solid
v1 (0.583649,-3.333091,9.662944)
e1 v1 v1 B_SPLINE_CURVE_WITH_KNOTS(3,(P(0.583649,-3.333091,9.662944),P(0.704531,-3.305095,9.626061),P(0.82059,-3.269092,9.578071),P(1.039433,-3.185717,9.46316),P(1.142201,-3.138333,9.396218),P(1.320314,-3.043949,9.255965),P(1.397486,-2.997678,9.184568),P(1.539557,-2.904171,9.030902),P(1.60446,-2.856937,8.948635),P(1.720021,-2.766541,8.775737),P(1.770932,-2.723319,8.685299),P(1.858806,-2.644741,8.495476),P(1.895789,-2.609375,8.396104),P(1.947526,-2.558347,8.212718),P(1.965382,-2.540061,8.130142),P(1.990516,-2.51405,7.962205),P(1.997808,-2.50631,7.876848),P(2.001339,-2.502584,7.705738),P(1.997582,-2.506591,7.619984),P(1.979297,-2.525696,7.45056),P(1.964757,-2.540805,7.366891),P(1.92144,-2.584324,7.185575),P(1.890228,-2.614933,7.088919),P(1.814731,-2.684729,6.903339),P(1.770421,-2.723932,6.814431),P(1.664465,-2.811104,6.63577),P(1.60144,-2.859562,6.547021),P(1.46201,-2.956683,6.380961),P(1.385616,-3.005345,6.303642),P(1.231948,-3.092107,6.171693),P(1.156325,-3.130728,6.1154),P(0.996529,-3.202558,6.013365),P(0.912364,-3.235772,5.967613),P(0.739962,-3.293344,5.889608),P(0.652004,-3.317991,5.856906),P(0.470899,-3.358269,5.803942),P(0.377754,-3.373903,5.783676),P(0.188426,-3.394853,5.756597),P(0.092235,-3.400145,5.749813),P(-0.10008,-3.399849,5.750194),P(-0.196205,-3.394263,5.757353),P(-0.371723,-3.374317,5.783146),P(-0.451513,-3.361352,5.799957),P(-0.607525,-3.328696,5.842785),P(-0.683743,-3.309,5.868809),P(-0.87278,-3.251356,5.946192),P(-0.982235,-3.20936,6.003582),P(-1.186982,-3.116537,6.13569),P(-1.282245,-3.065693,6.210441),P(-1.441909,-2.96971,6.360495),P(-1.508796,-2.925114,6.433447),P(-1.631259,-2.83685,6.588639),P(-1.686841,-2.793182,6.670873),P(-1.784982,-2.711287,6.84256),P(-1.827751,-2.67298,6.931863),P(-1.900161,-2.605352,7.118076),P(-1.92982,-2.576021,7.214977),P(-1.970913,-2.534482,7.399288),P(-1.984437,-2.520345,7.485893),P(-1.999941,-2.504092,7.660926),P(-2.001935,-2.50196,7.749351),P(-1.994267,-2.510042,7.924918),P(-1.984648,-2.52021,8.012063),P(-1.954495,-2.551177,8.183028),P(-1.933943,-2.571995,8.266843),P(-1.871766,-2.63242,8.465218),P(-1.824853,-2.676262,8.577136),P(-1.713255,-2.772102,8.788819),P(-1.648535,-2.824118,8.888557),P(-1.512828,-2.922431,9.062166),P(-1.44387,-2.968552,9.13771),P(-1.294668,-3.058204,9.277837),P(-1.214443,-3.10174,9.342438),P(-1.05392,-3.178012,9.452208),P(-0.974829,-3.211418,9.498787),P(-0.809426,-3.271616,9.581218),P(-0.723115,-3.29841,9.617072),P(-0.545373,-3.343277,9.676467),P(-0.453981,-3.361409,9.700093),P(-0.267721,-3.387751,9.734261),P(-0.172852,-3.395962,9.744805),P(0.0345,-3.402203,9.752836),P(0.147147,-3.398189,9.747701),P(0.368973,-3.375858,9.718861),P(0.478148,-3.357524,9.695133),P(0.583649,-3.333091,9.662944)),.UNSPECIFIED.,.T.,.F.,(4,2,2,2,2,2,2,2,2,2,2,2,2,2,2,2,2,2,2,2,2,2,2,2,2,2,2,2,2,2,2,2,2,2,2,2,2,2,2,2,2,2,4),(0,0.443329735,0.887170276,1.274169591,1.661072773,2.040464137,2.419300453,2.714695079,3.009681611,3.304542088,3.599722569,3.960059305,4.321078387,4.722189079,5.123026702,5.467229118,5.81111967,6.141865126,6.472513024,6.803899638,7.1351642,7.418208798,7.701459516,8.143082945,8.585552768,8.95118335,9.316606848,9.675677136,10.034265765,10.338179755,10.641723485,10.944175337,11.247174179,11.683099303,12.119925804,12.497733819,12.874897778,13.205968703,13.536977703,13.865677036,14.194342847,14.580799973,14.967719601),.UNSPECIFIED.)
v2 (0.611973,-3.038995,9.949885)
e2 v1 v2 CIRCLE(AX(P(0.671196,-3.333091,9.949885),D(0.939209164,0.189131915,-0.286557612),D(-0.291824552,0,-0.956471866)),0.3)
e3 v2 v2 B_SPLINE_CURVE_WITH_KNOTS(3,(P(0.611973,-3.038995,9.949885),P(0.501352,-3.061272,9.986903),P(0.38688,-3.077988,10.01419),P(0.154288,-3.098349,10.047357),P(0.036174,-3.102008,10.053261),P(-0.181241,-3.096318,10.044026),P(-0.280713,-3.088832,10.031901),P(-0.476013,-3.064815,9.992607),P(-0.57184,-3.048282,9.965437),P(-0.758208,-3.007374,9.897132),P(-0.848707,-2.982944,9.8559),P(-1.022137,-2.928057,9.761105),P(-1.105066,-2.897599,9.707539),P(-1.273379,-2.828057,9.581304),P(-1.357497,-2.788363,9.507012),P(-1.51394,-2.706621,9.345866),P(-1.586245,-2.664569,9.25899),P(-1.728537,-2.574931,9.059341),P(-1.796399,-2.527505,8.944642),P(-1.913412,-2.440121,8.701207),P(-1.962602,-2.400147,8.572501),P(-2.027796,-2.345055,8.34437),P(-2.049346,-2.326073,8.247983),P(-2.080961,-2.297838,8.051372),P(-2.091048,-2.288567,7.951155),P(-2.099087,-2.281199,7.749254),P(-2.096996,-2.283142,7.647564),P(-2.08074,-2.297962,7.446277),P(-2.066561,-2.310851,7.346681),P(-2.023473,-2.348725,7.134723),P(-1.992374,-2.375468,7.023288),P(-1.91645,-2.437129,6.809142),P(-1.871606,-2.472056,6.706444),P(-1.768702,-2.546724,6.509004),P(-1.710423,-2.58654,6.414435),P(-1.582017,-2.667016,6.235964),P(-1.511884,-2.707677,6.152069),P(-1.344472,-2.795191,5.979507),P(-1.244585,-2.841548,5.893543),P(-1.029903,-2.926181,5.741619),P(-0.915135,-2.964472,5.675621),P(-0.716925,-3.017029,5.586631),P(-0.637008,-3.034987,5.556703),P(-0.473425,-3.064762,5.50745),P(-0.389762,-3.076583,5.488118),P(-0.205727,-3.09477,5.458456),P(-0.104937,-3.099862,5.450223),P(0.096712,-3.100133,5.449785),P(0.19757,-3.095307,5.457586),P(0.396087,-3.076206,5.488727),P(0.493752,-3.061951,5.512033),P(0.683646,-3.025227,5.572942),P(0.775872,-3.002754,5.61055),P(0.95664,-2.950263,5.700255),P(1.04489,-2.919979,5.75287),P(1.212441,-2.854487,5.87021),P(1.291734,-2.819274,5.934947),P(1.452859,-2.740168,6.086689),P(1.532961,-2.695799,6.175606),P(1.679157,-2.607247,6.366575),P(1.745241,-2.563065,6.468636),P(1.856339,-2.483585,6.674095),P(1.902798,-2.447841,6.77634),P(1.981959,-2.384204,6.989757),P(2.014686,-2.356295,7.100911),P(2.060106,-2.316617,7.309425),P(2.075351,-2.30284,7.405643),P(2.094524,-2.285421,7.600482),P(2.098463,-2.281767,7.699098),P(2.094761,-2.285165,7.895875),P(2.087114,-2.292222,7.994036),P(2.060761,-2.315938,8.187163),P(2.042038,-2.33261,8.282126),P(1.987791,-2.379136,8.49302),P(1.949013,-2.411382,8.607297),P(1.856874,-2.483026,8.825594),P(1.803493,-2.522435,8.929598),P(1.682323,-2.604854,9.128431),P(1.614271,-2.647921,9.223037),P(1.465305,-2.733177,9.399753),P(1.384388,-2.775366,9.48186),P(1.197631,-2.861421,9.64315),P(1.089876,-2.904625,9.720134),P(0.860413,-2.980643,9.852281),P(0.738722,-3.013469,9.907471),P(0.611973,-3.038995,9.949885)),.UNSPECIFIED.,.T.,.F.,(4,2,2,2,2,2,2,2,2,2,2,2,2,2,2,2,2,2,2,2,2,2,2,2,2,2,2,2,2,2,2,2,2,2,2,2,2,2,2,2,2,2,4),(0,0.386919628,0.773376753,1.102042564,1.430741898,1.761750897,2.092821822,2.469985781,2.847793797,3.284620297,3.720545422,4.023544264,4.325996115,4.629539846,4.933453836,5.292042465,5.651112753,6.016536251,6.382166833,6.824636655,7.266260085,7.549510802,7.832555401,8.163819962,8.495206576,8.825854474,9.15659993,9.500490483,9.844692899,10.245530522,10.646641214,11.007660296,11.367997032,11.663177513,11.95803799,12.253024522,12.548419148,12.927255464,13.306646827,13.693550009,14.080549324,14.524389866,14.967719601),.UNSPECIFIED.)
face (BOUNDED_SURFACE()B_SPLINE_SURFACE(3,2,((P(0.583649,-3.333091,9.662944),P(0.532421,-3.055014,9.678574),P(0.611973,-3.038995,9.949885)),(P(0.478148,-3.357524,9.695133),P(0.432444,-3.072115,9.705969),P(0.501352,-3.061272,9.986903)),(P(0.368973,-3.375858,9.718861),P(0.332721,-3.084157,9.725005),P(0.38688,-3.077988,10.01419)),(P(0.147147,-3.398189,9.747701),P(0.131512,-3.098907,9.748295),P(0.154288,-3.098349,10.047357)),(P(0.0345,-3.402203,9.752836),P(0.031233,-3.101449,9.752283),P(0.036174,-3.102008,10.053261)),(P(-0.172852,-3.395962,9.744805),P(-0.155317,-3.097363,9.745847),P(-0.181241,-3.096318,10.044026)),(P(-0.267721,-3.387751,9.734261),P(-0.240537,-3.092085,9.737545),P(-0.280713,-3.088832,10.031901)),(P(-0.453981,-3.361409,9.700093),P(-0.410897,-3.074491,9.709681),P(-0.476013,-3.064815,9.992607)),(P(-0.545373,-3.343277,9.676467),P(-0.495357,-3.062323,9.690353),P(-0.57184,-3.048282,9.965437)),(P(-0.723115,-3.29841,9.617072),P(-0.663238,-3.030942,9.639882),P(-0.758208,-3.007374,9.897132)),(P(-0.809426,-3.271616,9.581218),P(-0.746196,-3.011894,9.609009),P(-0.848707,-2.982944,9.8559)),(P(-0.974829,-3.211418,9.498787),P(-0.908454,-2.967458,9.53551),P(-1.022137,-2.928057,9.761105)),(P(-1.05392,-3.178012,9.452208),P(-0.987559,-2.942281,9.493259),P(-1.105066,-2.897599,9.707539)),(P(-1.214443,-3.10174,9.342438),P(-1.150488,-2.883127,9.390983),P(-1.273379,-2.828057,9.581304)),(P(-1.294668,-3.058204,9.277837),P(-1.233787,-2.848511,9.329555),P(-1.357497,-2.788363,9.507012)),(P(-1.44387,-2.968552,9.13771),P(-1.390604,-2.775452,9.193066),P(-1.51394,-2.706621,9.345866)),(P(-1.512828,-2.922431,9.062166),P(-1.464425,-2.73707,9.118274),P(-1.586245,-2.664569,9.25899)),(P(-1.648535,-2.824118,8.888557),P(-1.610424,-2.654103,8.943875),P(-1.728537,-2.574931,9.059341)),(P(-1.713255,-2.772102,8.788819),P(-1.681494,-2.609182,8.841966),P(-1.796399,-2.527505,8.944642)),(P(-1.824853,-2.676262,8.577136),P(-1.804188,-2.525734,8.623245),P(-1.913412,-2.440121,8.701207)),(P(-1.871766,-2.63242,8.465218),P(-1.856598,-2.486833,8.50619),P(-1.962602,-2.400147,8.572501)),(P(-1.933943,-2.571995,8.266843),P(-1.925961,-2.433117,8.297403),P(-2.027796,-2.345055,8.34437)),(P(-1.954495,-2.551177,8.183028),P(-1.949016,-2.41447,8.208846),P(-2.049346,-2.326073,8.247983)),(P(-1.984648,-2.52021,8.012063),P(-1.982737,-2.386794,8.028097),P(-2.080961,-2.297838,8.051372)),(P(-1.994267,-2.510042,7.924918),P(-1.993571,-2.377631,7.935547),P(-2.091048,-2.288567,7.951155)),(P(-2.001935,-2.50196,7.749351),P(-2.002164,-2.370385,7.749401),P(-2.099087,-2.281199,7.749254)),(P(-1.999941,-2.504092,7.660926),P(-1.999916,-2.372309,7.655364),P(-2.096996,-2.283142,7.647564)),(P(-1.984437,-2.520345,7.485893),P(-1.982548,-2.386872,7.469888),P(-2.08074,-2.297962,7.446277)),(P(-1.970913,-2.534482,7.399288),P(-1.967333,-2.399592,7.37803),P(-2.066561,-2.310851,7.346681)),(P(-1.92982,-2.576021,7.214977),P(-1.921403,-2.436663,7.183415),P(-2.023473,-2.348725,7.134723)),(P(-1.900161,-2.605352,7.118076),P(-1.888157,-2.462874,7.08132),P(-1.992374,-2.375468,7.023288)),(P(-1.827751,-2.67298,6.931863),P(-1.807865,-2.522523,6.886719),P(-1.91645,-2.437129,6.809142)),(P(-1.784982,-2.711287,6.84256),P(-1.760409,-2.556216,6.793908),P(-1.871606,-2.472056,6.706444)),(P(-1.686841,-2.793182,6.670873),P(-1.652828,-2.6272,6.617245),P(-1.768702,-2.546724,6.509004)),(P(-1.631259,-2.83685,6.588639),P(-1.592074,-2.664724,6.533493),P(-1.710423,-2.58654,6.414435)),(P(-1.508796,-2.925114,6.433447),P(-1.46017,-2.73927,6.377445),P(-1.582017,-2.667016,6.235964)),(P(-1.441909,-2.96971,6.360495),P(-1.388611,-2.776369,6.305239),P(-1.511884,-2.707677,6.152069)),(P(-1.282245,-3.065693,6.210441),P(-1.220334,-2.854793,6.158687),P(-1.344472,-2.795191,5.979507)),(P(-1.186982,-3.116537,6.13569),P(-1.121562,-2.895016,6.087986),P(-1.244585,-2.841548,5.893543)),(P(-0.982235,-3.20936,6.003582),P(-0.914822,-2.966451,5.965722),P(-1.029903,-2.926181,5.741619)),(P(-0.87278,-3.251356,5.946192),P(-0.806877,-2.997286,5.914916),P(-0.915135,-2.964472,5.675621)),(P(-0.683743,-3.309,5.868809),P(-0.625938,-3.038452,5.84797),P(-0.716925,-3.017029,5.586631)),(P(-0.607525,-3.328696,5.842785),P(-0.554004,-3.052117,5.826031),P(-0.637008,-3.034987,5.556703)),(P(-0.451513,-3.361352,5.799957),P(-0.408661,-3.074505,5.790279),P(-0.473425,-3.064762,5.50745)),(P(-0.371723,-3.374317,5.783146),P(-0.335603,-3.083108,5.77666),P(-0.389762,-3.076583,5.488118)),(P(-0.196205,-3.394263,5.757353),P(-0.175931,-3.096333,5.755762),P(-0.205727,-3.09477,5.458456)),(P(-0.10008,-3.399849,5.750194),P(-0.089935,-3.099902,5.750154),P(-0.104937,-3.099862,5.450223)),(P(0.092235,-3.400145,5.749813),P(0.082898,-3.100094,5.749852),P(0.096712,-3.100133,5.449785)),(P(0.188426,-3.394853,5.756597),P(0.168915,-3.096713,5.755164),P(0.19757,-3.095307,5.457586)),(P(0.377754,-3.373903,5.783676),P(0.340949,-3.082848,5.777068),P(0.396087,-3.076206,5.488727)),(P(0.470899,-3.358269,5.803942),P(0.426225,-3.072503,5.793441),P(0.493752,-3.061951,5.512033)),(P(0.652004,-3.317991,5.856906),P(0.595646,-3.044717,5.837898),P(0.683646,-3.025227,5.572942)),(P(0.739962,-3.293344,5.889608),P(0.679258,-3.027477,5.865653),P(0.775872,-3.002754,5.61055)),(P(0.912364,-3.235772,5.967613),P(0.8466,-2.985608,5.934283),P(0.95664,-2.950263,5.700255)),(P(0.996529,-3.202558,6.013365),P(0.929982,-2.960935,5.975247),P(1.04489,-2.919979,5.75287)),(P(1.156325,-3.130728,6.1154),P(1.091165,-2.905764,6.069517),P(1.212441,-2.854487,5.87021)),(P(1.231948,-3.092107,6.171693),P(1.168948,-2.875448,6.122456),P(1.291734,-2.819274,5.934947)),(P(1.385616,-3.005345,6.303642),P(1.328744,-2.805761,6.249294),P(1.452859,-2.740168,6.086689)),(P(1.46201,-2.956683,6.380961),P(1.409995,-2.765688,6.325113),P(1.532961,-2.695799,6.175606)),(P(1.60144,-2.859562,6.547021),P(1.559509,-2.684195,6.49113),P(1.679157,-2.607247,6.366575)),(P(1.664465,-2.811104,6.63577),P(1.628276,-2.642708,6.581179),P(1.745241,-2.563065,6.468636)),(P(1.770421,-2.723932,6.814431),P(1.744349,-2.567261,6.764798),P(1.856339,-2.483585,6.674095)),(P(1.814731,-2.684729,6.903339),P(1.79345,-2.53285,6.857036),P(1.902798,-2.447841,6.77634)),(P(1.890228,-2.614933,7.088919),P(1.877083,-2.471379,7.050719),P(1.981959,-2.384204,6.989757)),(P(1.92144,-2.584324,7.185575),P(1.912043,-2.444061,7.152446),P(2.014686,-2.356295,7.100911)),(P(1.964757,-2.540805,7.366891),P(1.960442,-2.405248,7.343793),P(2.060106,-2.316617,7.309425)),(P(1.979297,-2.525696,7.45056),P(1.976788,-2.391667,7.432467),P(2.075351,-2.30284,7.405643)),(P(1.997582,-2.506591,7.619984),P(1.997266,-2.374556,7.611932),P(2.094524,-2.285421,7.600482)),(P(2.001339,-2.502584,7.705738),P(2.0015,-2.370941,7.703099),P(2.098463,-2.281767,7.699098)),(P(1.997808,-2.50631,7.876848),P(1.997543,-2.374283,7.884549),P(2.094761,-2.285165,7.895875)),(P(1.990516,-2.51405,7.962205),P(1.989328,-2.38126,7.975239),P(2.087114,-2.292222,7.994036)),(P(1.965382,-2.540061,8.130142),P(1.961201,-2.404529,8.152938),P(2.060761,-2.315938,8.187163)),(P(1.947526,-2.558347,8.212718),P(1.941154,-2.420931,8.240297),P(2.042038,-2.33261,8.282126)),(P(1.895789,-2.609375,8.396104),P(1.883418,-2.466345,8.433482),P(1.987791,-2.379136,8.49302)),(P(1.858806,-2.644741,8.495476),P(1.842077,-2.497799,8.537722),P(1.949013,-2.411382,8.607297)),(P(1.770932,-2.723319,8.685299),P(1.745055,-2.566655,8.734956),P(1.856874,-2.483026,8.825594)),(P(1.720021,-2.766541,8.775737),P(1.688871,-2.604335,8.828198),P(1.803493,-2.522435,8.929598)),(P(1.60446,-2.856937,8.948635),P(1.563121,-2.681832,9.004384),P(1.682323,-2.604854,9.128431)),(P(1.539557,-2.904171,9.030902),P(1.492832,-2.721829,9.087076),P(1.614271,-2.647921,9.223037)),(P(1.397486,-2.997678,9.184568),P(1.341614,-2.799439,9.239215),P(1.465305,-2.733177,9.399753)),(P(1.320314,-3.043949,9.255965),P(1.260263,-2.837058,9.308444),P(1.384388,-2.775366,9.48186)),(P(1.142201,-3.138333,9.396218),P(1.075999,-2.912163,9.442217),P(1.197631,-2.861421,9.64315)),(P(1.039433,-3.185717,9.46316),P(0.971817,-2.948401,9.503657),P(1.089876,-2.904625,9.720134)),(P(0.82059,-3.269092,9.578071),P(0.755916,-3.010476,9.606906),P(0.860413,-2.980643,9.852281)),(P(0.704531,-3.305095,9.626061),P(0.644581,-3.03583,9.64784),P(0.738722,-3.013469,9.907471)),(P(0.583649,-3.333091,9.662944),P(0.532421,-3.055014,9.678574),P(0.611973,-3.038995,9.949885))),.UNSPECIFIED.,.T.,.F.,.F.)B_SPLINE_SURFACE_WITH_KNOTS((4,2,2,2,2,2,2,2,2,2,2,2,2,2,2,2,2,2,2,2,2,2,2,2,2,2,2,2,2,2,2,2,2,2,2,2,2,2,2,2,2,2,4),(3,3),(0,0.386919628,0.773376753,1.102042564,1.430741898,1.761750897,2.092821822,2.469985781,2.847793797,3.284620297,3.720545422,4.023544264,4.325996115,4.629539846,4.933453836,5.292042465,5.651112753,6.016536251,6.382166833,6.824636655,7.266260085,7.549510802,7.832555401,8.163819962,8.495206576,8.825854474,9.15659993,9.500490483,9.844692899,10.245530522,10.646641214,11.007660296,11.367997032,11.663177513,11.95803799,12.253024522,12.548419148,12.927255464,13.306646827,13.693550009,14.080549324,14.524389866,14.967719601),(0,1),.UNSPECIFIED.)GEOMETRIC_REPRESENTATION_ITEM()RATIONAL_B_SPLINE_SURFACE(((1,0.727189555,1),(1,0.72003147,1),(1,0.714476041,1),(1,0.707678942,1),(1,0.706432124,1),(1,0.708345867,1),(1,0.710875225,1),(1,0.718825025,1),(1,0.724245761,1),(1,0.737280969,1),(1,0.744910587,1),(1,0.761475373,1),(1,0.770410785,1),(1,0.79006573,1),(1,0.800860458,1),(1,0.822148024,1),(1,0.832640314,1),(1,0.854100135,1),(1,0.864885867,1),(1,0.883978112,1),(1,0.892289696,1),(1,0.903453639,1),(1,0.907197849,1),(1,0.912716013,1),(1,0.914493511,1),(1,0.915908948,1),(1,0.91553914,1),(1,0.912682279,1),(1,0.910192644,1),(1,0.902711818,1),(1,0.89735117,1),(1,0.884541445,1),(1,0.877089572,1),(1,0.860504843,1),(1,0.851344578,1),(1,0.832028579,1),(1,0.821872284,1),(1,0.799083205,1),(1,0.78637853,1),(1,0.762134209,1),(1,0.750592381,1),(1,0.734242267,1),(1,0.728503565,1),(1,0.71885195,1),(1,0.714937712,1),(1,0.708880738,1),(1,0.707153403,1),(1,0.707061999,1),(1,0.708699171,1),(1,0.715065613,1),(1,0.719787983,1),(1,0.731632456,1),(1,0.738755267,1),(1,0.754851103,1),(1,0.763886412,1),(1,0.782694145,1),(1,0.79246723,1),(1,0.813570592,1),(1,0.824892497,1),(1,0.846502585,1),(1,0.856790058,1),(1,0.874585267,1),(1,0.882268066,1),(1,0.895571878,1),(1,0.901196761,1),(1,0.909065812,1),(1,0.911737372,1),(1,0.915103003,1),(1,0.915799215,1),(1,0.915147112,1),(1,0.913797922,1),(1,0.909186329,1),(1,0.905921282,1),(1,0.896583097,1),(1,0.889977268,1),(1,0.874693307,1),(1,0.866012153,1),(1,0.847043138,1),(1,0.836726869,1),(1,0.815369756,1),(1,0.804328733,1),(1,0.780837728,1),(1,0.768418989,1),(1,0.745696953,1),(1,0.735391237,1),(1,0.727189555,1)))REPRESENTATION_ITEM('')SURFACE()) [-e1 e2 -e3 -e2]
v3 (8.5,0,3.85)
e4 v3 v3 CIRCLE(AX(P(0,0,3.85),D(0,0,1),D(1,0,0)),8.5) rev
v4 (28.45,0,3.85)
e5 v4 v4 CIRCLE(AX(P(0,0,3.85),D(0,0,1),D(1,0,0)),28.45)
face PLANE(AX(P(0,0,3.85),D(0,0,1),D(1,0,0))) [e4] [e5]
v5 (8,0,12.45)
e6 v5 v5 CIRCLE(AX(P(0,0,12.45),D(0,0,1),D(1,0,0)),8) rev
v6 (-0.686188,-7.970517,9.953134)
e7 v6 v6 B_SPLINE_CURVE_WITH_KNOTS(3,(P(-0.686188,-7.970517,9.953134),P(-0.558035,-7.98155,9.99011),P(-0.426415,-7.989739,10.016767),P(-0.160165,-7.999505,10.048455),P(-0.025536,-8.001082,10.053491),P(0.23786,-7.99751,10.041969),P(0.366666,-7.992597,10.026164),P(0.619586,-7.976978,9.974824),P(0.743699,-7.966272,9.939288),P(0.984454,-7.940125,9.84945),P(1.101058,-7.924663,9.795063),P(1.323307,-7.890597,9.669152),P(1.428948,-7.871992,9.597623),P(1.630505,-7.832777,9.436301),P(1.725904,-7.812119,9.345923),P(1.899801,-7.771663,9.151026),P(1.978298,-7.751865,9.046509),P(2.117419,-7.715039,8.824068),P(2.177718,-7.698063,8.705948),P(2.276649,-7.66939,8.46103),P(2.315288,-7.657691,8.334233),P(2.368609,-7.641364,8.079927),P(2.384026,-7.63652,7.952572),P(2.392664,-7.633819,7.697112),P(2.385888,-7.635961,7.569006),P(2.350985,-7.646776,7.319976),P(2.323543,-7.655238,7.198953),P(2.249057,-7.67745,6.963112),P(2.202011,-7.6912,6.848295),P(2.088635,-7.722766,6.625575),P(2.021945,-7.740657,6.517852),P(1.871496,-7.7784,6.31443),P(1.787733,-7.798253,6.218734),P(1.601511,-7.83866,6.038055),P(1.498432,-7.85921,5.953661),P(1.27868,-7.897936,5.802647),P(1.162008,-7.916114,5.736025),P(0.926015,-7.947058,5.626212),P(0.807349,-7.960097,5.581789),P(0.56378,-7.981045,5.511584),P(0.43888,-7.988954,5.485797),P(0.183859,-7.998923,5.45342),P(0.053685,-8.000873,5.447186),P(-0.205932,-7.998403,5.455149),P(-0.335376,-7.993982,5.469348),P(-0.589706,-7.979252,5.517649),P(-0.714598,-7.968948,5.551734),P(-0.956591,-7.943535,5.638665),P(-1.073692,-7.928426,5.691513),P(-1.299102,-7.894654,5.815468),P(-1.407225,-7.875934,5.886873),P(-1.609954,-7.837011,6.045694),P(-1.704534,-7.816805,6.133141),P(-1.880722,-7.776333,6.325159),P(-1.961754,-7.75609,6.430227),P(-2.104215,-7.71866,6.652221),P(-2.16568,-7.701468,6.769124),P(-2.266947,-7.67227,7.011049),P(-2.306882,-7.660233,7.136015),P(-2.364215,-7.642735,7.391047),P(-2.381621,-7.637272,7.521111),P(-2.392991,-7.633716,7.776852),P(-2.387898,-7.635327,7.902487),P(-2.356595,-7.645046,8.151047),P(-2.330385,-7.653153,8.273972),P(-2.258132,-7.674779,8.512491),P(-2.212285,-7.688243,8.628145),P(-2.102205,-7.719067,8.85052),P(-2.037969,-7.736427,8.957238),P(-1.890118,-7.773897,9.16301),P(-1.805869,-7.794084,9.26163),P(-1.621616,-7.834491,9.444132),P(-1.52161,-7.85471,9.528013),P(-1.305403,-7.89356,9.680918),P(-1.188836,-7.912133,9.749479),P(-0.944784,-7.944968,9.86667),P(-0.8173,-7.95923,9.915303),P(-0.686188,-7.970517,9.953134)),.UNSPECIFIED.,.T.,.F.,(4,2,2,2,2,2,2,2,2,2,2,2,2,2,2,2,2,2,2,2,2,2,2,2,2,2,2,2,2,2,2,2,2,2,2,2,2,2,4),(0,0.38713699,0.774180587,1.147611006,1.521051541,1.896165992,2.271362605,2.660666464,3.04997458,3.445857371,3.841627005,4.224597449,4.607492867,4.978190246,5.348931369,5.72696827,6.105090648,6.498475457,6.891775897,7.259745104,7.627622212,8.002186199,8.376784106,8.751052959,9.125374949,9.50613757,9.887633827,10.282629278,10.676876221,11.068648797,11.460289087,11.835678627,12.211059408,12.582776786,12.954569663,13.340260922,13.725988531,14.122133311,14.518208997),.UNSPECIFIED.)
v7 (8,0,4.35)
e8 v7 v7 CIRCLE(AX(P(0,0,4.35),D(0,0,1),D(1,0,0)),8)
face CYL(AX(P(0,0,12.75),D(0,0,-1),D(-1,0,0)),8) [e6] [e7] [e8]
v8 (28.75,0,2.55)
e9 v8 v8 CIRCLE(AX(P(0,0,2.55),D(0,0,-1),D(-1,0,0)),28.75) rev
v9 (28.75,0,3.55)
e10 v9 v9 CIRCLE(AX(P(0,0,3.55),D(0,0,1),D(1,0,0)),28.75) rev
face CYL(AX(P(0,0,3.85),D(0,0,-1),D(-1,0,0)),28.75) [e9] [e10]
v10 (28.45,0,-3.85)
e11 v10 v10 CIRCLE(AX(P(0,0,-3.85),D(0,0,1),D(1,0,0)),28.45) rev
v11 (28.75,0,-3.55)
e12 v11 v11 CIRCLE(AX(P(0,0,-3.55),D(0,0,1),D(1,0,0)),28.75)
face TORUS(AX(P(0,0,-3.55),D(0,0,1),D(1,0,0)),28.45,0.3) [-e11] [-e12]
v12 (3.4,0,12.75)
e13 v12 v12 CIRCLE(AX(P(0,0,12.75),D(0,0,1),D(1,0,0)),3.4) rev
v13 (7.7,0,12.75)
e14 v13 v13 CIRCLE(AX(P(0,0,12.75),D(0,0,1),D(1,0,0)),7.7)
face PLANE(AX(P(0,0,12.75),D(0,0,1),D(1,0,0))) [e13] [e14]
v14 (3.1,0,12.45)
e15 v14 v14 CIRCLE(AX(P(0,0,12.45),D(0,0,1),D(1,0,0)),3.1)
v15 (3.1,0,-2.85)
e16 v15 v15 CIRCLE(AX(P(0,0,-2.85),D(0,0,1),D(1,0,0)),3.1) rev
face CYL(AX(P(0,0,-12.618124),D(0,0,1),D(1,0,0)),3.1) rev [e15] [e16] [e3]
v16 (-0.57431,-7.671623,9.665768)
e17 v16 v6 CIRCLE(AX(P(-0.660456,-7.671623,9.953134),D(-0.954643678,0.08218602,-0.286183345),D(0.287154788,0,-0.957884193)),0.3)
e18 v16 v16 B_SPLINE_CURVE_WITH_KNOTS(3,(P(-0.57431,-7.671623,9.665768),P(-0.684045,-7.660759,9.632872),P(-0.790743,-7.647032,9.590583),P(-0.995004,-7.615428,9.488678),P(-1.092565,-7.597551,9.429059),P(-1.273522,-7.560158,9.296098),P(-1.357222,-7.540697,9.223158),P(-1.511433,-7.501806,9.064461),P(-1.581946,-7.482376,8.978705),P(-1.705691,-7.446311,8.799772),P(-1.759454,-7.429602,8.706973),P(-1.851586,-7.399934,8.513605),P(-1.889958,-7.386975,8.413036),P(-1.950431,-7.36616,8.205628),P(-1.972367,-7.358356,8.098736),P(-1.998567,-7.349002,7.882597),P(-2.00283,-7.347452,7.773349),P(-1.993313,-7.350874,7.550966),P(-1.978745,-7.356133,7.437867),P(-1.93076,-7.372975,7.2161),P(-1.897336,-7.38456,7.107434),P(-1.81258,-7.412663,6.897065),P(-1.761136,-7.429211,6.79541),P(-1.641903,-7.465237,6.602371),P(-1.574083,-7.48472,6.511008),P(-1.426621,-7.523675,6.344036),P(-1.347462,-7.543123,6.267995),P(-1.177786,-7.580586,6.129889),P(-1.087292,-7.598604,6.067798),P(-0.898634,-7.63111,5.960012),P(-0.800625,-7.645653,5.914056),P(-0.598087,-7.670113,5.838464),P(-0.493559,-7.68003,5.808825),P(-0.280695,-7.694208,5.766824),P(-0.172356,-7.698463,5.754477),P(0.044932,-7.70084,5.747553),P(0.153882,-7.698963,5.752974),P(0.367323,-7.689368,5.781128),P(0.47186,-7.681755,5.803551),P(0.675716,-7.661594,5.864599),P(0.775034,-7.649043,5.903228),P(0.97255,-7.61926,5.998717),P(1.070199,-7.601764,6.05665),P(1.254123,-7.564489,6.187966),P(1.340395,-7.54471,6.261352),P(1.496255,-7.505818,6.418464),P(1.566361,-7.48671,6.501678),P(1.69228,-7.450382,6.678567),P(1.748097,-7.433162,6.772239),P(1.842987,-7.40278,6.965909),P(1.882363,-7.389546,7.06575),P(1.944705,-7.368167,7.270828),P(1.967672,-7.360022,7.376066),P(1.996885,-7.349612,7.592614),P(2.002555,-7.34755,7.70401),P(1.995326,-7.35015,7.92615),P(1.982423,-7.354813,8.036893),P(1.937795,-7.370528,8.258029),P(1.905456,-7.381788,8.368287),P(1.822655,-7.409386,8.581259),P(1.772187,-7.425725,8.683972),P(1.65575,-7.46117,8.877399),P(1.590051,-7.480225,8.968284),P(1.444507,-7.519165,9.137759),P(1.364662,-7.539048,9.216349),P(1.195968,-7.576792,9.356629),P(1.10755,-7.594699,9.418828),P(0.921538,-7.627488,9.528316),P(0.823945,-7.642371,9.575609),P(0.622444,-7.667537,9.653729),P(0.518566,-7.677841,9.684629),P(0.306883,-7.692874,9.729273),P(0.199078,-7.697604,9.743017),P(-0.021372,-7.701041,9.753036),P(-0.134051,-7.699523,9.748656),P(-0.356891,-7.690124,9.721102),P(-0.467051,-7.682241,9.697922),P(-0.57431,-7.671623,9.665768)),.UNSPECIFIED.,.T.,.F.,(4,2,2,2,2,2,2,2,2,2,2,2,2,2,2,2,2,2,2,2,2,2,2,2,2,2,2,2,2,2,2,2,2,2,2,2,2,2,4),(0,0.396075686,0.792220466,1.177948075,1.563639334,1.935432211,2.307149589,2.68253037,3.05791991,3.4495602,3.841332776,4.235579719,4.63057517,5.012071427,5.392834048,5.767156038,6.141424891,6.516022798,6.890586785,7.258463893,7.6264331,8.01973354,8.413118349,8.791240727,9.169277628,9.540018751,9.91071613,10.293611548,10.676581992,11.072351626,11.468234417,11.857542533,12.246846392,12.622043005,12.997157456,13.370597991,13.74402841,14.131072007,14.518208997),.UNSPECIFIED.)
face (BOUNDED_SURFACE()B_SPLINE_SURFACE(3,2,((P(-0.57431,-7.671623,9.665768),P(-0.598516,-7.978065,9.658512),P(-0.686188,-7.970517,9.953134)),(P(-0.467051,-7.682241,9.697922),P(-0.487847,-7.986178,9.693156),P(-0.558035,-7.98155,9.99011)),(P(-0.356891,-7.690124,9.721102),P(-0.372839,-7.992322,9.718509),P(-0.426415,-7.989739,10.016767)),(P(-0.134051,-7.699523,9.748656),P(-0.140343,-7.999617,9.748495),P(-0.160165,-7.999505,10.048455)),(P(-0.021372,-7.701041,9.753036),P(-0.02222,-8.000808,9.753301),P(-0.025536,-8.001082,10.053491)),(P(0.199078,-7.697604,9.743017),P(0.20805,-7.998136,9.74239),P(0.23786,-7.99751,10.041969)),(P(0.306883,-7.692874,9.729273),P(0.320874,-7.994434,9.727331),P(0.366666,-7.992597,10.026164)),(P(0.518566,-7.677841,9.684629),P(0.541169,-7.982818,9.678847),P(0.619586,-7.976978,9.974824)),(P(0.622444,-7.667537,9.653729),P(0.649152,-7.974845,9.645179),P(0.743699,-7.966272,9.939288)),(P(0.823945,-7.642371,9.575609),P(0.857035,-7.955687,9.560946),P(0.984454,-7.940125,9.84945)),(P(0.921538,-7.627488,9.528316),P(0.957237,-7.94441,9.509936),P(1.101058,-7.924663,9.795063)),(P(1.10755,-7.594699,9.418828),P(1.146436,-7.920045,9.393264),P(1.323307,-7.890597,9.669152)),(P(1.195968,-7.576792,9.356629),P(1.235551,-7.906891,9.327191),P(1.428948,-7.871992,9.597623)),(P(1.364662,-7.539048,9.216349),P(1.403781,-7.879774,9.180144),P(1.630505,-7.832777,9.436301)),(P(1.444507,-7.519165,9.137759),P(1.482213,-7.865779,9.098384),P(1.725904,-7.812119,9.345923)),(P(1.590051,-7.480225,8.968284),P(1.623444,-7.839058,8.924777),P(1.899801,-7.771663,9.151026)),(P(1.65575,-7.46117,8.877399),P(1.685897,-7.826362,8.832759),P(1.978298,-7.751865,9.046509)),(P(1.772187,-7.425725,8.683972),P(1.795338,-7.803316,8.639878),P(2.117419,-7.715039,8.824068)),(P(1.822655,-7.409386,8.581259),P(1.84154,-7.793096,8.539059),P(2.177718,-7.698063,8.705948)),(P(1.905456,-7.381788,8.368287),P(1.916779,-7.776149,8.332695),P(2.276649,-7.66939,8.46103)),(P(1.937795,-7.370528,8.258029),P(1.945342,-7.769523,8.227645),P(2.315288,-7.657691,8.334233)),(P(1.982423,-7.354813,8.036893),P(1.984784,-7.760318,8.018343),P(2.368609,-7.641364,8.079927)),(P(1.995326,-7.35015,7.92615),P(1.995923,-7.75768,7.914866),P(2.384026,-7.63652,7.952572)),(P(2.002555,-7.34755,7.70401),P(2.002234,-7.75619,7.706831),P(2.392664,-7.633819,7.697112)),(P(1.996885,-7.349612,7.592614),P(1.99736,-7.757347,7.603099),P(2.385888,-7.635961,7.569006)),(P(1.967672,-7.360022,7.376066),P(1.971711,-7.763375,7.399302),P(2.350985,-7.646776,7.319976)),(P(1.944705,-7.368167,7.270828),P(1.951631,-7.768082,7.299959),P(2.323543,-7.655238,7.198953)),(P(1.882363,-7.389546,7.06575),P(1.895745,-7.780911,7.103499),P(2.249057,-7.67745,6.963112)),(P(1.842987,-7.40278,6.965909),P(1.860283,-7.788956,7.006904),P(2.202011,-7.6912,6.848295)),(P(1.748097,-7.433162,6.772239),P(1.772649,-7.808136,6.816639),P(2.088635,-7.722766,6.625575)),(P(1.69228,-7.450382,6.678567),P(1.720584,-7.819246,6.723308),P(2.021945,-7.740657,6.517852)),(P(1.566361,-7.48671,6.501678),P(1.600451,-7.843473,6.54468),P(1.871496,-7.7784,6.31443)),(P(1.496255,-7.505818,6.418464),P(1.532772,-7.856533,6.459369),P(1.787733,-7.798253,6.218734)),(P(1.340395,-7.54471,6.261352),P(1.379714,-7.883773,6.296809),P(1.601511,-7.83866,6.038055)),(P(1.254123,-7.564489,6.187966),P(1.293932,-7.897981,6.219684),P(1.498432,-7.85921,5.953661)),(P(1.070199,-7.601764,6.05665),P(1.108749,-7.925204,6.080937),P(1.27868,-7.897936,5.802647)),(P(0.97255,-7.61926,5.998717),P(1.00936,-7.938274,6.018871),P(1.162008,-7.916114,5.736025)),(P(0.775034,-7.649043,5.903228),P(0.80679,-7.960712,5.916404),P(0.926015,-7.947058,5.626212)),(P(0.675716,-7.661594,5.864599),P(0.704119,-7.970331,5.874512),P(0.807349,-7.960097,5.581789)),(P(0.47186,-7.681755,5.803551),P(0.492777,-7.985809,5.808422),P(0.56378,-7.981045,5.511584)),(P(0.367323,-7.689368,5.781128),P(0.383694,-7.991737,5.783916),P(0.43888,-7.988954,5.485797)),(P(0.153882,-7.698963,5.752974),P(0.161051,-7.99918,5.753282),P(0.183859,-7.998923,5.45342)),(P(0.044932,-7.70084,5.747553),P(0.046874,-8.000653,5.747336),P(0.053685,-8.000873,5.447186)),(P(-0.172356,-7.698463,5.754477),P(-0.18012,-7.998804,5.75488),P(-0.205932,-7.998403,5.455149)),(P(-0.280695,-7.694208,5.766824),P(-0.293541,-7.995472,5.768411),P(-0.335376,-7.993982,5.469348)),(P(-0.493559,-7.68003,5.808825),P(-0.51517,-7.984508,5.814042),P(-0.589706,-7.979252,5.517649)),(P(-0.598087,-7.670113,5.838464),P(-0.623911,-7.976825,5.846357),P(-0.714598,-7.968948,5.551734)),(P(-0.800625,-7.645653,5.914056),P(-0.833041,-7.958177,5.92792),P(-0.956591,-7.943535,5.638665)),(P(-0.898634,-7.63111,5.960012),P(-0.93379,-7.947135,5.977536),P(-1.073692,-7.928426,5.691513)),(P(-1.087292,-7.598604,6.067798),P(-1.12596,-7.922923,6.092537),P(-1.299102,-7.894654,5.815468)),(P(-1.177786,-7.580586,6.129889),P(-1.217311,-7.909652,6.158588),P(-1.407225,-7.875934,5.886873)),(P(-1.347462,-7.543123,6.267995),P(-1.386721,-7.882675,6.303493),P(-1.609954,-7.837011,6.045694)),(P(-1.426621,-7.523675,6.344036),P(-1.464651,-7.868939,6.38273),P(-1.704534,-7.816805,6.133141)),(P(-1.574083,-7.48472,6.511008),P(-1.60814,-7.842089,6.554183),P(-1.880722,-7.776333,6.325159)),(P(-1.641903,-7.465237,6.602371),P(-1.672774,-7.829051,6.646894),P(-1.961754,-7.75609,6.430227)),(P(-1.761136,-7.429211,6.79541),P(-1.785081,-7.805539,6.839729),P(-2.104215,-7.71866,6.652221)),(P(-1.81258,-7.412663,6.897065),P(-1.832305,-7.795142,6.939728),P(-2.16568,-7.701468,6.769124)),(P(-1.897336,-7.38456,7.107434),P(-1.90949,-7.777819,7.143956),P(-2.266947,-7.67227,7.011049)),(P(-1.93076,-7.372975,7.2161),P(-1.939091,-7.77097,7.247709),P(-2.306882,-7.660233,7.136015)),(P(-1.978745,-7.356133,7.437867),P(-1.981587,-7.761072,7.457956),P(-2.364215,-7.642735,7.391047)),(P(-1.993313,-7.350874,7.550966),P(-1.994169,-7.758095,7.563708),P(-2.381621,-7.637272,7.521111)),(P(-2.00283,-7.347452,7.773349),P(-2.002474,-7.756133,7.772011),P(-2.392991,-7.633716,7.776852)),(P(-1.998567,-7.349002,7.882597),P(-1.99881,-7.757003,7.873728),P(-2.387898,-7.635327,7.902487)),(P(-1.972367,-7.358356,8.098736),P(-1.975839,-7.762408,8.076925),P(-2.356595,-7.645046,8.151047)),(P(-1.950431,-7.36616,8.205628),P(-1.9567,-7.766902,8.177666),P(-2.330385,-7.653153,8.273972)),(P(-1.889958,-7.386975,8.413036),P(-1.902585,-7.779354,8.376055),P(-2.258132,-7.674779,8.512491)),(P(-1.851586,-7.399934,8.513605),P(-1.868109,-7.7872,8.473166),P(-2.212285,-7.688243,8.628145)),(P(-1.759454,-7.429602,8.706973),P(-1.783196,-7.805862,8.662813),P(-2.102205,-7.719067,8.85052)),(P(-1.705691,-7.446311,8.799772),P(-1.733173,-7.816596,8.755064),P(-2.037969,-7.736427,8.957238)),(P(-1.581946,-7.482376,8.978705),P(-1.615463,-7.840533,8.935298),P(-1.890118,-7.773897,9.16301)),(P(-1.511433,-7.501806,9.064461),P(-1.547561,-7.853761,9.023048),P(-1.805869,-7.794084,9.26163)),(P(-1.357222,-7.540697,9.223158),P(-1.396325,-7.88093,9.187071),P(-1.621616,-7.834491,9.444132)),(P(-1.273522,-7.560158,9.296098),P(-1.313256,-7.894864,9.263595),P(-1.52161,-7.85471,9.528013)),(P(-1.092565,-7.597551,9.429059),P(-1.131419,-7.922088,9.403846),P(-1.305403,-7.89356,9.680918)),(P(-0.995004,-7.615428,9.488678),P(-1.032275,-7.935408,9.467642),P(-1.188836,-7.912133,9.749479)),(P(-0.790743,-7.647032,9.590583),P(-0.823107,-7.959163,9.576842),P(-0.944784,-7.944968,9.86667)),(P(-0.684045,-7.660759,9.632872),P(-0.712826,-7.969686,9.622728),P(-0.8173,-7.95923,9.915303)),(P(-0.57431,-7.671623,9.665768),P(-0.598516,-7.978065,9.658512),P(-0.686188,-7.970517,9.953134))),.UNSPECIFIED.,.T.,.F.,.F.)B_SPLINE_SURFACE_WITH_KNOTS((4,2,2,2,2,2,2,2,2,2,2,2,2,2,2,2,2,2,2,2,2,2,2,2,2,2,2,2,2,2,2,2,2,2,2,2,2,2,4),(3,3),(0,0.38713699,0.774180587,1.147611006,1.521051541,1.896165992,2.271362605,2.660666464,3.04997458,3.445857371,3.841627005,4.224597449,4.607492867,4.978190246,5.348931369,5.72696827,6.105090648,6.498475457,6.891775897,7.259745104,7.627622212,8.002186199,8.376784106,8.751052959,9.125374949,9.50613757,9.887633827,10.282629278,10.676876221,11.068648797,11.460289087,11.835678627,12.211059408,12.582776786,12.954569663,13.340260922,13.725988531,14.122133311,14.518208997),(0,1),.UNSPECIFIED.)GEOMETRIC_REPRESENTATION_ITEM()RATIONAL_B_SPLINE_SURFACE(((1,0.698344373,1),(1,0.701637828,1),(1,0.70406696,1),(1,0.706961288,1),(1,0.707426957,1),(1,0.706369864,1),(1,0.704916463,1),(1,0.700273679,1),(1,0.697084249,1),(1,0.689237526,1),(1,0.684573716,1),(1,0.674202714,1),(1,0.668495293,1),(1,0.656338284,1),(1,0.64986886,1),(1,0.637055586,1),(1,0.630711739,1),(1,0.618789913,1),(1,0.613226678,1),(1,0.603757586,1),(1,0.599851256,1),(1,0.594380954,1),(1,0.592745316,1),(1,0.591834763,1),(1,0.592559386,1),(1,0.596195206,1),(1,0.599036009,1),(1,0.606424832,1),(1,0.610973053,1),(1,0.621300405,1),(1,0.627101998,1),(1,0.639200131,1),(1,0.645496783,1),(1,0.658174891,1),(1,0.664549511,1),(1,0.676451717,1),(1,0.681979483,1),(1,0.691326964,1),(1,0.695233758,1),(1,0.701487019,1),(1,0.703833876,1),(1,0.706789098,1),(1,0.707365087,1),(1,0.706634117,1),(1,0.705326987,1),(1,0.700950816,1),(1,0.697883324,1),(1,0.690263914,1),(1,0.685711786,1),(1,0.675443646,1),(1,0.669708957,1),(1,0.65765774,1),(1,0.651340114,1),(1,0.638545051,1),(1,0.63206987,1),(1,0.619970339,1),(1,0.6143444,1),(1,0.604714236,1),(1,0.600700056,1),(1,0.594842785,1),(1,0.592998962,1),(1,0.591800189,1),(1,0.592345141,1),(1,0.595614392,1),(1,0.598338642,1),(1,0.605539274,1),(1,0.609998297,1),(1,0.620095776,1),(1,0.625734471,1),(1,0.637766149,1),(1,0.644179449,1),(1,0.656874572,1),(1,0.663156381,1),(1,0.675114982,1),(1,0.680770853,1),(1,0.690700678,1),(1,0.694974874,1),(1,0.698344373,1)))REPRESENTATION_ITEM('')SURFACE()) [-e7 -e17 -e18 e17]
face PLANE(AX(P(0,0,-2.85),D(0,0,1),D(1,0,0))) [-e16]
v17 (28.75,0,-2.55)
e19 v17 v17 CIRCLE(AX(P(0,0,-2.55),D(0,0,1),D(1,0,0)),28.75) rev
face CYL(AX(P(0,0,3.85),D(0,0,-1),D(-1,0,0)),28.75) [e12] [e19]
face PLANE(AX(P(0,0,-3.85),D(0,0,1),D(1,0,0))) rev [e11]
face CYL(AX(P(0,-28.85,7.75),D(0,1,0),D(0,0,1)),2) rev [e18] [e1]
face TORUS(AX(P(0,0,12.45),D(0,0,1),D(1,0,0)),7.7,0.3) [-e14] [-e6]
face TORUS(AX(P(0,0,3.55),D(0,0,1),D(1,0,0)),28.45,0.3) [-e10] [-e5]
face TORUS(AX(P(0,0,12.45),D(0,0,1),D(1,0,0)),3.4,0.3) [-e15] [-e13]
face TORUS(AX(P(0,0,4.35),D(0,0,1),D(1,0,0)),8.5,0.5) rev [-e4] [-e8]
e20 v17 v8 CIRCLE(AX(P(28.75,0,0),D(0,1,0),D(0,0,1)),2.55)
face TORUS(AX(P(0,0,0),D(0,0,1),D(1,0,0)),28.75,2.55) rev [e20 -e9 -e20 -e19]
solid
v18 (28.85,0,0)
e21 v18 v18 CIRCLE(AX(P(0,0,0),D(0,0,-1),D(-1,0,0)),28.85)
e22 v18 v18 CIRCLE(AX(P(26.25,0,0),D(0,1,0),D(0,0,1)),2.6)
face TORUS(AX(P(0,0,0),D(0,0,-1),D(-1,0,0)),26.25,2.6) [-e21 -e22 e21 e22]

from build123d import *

# Parameters (mm, degrees)
SKETCH1_R           = 28.75
BOSS_EXTRUDE1_DEPTH = 3.85
SKETCH2_R           = 2.55
SWEEP1_OUTLINE_R    = 2.6
SKETCH4_R           = 8
BOSS_EXTRUDE2_DEPTH = 8.9
SKETCH5_R           = 3.1
CUT_EXTRUDE1_DEPTH  = 15.6
SKETCH6_R           = 2
CUT_EXTRUDE2_DEPTH  = 43.745847887
FILLET1_R           = 0.5
FILLET2_R           = 0.3
FILLET3_R           = 0.3
FILLET4_R           = 0.3
FILLET5_R           = 0.3


# Read off the part's stored shape, not the designer's step: Sweep1
with BuildPart() as part:
    # Sketch1 → Boss-Extrude1 (new, symmetric)
    with BuildSketch(Plane.XY):
        with Locations(Location((0, 0, 0), (0, 0, 180))):
            Circle(SKETCH1_R)
    extrude(amount=BOSS_EXTRUDE1_DEPTH, both=True)

    # Cut-Sweep1: sweep along a curve in space
    with BuildLine() as cut_sweep1_path:
        ThreePointArc((28.75, 0, -3.85), (20.329319959, 20.329319959, -3.85), (0, 28.75, -3.85))
        ThreePointArc((0, 28.75, -3.85), (-20.329319959, 20.329319959, -3.85), (-28.75, 0, -3.85))
        ThreePointArc((-28.75, 0, -3.85), (-20.329319959, -20.329319959, -3.85), (0, -28.75, -3.85))
        ThreePointArc((0, -28.75, -3.85), (20.329319959, -20.329319959, -3.85), (28.75, 0, -3.85))
    # Sketch2 → Cut-Sweep1 (sweep, cut)
    with BuildSketch(Plane(origin=(0, 0, 0), x_dir=(1, 0, 0), z_dir=(0, 1, 0))):
        with Locations((28.75, 0)):
            Circle(SKETCH2_R)
    sweep(path=cut_sweep1_path.line, mode=Mode.SUBTRACT)

    # Sketch4 → Boss-Extrude2 (add)
    with BuildSketch(Plane.XY.offset(3.85)):
        Circle(SKETCH4_R)
    extrude(amount=BOSS_EXTRUDE2_DEPTH)

    # Sketch5 → Cut-Extrude1 (cut)
    with BuildSketch(Plane.XY.offset(12.75)):
        Circle(SKETCH5_R)
    extrude(amount=-CUT_EXTRUDE1_DEPTH, mode=Mode.SUBTRACT)

    # Sketch6 → Cut-Extrude2 (cut, through all)
    with BuildSketch(Plane(origin=(0, 0, 0), x_dir=(1, 0, 0), z_dir=(0, 1, 0))):
        with Locations(Location((0, -7.75, 0), (0, 0, 270))):
            Circle(SKETCH6_R)
    extrude(amount=-CUT_EXTRUDE2_DEPTH, mode=Mode.SUBTRACT)

    # Fillet1
    fillet1_edges = [part.edges().sort_by_distance(p)[0] for p in [
        (-8, 0, 3.85),
    ]]
    fillet(fillet1_edges, radius=FILLET1_R)

    # Fillet2
    fillet2_edges = [part.edges().sort_by_distance(p)[0] for p in [
        (-8, 0, 12.75),
    ]]
    fillet(fillet2_edges, radius=FILLET2_R)

    # Fillet3
    fillet3_edges = [part.edges().sort_by_distance(p)[0] for p in [
        (2e-09, -3.100000006, 5.749999996),
        (1e-09, -7.999999994, 5.749999986),
    ]]
    fillet(fillet3_edges, radius=FILLET3_R)

    # Fillet4
    fillet4_edges = [part.edges().sort_by_distance(p)[0] for p in [
        (-3.1, 0, 12.75),
    ]]
    fillet(fillet4_edges, radius=FILLET4_R)

    # Fillet5
    fillet5_edges = [part.edges().sort_by_distance(p)[0] for p in [
        (28.75, 0, -3.85),
        (28.75, 0, 3.85),
    ]]
    fillet(fillet5_edges, radius=FILLET5_R)


with BuildPart() as body_2:
    # Sweep1 outline → Sweep1 (revolve)
    with BuildSketch(Plane.XZ):
        with Locations((26.25, 0)):
            Circle(SWEEP1_OUTLINE_R)
    revolve(axis=Axis((0, 0, 0), (0, 0, 1)))


solid = Compound([part.part, body_2.part])
